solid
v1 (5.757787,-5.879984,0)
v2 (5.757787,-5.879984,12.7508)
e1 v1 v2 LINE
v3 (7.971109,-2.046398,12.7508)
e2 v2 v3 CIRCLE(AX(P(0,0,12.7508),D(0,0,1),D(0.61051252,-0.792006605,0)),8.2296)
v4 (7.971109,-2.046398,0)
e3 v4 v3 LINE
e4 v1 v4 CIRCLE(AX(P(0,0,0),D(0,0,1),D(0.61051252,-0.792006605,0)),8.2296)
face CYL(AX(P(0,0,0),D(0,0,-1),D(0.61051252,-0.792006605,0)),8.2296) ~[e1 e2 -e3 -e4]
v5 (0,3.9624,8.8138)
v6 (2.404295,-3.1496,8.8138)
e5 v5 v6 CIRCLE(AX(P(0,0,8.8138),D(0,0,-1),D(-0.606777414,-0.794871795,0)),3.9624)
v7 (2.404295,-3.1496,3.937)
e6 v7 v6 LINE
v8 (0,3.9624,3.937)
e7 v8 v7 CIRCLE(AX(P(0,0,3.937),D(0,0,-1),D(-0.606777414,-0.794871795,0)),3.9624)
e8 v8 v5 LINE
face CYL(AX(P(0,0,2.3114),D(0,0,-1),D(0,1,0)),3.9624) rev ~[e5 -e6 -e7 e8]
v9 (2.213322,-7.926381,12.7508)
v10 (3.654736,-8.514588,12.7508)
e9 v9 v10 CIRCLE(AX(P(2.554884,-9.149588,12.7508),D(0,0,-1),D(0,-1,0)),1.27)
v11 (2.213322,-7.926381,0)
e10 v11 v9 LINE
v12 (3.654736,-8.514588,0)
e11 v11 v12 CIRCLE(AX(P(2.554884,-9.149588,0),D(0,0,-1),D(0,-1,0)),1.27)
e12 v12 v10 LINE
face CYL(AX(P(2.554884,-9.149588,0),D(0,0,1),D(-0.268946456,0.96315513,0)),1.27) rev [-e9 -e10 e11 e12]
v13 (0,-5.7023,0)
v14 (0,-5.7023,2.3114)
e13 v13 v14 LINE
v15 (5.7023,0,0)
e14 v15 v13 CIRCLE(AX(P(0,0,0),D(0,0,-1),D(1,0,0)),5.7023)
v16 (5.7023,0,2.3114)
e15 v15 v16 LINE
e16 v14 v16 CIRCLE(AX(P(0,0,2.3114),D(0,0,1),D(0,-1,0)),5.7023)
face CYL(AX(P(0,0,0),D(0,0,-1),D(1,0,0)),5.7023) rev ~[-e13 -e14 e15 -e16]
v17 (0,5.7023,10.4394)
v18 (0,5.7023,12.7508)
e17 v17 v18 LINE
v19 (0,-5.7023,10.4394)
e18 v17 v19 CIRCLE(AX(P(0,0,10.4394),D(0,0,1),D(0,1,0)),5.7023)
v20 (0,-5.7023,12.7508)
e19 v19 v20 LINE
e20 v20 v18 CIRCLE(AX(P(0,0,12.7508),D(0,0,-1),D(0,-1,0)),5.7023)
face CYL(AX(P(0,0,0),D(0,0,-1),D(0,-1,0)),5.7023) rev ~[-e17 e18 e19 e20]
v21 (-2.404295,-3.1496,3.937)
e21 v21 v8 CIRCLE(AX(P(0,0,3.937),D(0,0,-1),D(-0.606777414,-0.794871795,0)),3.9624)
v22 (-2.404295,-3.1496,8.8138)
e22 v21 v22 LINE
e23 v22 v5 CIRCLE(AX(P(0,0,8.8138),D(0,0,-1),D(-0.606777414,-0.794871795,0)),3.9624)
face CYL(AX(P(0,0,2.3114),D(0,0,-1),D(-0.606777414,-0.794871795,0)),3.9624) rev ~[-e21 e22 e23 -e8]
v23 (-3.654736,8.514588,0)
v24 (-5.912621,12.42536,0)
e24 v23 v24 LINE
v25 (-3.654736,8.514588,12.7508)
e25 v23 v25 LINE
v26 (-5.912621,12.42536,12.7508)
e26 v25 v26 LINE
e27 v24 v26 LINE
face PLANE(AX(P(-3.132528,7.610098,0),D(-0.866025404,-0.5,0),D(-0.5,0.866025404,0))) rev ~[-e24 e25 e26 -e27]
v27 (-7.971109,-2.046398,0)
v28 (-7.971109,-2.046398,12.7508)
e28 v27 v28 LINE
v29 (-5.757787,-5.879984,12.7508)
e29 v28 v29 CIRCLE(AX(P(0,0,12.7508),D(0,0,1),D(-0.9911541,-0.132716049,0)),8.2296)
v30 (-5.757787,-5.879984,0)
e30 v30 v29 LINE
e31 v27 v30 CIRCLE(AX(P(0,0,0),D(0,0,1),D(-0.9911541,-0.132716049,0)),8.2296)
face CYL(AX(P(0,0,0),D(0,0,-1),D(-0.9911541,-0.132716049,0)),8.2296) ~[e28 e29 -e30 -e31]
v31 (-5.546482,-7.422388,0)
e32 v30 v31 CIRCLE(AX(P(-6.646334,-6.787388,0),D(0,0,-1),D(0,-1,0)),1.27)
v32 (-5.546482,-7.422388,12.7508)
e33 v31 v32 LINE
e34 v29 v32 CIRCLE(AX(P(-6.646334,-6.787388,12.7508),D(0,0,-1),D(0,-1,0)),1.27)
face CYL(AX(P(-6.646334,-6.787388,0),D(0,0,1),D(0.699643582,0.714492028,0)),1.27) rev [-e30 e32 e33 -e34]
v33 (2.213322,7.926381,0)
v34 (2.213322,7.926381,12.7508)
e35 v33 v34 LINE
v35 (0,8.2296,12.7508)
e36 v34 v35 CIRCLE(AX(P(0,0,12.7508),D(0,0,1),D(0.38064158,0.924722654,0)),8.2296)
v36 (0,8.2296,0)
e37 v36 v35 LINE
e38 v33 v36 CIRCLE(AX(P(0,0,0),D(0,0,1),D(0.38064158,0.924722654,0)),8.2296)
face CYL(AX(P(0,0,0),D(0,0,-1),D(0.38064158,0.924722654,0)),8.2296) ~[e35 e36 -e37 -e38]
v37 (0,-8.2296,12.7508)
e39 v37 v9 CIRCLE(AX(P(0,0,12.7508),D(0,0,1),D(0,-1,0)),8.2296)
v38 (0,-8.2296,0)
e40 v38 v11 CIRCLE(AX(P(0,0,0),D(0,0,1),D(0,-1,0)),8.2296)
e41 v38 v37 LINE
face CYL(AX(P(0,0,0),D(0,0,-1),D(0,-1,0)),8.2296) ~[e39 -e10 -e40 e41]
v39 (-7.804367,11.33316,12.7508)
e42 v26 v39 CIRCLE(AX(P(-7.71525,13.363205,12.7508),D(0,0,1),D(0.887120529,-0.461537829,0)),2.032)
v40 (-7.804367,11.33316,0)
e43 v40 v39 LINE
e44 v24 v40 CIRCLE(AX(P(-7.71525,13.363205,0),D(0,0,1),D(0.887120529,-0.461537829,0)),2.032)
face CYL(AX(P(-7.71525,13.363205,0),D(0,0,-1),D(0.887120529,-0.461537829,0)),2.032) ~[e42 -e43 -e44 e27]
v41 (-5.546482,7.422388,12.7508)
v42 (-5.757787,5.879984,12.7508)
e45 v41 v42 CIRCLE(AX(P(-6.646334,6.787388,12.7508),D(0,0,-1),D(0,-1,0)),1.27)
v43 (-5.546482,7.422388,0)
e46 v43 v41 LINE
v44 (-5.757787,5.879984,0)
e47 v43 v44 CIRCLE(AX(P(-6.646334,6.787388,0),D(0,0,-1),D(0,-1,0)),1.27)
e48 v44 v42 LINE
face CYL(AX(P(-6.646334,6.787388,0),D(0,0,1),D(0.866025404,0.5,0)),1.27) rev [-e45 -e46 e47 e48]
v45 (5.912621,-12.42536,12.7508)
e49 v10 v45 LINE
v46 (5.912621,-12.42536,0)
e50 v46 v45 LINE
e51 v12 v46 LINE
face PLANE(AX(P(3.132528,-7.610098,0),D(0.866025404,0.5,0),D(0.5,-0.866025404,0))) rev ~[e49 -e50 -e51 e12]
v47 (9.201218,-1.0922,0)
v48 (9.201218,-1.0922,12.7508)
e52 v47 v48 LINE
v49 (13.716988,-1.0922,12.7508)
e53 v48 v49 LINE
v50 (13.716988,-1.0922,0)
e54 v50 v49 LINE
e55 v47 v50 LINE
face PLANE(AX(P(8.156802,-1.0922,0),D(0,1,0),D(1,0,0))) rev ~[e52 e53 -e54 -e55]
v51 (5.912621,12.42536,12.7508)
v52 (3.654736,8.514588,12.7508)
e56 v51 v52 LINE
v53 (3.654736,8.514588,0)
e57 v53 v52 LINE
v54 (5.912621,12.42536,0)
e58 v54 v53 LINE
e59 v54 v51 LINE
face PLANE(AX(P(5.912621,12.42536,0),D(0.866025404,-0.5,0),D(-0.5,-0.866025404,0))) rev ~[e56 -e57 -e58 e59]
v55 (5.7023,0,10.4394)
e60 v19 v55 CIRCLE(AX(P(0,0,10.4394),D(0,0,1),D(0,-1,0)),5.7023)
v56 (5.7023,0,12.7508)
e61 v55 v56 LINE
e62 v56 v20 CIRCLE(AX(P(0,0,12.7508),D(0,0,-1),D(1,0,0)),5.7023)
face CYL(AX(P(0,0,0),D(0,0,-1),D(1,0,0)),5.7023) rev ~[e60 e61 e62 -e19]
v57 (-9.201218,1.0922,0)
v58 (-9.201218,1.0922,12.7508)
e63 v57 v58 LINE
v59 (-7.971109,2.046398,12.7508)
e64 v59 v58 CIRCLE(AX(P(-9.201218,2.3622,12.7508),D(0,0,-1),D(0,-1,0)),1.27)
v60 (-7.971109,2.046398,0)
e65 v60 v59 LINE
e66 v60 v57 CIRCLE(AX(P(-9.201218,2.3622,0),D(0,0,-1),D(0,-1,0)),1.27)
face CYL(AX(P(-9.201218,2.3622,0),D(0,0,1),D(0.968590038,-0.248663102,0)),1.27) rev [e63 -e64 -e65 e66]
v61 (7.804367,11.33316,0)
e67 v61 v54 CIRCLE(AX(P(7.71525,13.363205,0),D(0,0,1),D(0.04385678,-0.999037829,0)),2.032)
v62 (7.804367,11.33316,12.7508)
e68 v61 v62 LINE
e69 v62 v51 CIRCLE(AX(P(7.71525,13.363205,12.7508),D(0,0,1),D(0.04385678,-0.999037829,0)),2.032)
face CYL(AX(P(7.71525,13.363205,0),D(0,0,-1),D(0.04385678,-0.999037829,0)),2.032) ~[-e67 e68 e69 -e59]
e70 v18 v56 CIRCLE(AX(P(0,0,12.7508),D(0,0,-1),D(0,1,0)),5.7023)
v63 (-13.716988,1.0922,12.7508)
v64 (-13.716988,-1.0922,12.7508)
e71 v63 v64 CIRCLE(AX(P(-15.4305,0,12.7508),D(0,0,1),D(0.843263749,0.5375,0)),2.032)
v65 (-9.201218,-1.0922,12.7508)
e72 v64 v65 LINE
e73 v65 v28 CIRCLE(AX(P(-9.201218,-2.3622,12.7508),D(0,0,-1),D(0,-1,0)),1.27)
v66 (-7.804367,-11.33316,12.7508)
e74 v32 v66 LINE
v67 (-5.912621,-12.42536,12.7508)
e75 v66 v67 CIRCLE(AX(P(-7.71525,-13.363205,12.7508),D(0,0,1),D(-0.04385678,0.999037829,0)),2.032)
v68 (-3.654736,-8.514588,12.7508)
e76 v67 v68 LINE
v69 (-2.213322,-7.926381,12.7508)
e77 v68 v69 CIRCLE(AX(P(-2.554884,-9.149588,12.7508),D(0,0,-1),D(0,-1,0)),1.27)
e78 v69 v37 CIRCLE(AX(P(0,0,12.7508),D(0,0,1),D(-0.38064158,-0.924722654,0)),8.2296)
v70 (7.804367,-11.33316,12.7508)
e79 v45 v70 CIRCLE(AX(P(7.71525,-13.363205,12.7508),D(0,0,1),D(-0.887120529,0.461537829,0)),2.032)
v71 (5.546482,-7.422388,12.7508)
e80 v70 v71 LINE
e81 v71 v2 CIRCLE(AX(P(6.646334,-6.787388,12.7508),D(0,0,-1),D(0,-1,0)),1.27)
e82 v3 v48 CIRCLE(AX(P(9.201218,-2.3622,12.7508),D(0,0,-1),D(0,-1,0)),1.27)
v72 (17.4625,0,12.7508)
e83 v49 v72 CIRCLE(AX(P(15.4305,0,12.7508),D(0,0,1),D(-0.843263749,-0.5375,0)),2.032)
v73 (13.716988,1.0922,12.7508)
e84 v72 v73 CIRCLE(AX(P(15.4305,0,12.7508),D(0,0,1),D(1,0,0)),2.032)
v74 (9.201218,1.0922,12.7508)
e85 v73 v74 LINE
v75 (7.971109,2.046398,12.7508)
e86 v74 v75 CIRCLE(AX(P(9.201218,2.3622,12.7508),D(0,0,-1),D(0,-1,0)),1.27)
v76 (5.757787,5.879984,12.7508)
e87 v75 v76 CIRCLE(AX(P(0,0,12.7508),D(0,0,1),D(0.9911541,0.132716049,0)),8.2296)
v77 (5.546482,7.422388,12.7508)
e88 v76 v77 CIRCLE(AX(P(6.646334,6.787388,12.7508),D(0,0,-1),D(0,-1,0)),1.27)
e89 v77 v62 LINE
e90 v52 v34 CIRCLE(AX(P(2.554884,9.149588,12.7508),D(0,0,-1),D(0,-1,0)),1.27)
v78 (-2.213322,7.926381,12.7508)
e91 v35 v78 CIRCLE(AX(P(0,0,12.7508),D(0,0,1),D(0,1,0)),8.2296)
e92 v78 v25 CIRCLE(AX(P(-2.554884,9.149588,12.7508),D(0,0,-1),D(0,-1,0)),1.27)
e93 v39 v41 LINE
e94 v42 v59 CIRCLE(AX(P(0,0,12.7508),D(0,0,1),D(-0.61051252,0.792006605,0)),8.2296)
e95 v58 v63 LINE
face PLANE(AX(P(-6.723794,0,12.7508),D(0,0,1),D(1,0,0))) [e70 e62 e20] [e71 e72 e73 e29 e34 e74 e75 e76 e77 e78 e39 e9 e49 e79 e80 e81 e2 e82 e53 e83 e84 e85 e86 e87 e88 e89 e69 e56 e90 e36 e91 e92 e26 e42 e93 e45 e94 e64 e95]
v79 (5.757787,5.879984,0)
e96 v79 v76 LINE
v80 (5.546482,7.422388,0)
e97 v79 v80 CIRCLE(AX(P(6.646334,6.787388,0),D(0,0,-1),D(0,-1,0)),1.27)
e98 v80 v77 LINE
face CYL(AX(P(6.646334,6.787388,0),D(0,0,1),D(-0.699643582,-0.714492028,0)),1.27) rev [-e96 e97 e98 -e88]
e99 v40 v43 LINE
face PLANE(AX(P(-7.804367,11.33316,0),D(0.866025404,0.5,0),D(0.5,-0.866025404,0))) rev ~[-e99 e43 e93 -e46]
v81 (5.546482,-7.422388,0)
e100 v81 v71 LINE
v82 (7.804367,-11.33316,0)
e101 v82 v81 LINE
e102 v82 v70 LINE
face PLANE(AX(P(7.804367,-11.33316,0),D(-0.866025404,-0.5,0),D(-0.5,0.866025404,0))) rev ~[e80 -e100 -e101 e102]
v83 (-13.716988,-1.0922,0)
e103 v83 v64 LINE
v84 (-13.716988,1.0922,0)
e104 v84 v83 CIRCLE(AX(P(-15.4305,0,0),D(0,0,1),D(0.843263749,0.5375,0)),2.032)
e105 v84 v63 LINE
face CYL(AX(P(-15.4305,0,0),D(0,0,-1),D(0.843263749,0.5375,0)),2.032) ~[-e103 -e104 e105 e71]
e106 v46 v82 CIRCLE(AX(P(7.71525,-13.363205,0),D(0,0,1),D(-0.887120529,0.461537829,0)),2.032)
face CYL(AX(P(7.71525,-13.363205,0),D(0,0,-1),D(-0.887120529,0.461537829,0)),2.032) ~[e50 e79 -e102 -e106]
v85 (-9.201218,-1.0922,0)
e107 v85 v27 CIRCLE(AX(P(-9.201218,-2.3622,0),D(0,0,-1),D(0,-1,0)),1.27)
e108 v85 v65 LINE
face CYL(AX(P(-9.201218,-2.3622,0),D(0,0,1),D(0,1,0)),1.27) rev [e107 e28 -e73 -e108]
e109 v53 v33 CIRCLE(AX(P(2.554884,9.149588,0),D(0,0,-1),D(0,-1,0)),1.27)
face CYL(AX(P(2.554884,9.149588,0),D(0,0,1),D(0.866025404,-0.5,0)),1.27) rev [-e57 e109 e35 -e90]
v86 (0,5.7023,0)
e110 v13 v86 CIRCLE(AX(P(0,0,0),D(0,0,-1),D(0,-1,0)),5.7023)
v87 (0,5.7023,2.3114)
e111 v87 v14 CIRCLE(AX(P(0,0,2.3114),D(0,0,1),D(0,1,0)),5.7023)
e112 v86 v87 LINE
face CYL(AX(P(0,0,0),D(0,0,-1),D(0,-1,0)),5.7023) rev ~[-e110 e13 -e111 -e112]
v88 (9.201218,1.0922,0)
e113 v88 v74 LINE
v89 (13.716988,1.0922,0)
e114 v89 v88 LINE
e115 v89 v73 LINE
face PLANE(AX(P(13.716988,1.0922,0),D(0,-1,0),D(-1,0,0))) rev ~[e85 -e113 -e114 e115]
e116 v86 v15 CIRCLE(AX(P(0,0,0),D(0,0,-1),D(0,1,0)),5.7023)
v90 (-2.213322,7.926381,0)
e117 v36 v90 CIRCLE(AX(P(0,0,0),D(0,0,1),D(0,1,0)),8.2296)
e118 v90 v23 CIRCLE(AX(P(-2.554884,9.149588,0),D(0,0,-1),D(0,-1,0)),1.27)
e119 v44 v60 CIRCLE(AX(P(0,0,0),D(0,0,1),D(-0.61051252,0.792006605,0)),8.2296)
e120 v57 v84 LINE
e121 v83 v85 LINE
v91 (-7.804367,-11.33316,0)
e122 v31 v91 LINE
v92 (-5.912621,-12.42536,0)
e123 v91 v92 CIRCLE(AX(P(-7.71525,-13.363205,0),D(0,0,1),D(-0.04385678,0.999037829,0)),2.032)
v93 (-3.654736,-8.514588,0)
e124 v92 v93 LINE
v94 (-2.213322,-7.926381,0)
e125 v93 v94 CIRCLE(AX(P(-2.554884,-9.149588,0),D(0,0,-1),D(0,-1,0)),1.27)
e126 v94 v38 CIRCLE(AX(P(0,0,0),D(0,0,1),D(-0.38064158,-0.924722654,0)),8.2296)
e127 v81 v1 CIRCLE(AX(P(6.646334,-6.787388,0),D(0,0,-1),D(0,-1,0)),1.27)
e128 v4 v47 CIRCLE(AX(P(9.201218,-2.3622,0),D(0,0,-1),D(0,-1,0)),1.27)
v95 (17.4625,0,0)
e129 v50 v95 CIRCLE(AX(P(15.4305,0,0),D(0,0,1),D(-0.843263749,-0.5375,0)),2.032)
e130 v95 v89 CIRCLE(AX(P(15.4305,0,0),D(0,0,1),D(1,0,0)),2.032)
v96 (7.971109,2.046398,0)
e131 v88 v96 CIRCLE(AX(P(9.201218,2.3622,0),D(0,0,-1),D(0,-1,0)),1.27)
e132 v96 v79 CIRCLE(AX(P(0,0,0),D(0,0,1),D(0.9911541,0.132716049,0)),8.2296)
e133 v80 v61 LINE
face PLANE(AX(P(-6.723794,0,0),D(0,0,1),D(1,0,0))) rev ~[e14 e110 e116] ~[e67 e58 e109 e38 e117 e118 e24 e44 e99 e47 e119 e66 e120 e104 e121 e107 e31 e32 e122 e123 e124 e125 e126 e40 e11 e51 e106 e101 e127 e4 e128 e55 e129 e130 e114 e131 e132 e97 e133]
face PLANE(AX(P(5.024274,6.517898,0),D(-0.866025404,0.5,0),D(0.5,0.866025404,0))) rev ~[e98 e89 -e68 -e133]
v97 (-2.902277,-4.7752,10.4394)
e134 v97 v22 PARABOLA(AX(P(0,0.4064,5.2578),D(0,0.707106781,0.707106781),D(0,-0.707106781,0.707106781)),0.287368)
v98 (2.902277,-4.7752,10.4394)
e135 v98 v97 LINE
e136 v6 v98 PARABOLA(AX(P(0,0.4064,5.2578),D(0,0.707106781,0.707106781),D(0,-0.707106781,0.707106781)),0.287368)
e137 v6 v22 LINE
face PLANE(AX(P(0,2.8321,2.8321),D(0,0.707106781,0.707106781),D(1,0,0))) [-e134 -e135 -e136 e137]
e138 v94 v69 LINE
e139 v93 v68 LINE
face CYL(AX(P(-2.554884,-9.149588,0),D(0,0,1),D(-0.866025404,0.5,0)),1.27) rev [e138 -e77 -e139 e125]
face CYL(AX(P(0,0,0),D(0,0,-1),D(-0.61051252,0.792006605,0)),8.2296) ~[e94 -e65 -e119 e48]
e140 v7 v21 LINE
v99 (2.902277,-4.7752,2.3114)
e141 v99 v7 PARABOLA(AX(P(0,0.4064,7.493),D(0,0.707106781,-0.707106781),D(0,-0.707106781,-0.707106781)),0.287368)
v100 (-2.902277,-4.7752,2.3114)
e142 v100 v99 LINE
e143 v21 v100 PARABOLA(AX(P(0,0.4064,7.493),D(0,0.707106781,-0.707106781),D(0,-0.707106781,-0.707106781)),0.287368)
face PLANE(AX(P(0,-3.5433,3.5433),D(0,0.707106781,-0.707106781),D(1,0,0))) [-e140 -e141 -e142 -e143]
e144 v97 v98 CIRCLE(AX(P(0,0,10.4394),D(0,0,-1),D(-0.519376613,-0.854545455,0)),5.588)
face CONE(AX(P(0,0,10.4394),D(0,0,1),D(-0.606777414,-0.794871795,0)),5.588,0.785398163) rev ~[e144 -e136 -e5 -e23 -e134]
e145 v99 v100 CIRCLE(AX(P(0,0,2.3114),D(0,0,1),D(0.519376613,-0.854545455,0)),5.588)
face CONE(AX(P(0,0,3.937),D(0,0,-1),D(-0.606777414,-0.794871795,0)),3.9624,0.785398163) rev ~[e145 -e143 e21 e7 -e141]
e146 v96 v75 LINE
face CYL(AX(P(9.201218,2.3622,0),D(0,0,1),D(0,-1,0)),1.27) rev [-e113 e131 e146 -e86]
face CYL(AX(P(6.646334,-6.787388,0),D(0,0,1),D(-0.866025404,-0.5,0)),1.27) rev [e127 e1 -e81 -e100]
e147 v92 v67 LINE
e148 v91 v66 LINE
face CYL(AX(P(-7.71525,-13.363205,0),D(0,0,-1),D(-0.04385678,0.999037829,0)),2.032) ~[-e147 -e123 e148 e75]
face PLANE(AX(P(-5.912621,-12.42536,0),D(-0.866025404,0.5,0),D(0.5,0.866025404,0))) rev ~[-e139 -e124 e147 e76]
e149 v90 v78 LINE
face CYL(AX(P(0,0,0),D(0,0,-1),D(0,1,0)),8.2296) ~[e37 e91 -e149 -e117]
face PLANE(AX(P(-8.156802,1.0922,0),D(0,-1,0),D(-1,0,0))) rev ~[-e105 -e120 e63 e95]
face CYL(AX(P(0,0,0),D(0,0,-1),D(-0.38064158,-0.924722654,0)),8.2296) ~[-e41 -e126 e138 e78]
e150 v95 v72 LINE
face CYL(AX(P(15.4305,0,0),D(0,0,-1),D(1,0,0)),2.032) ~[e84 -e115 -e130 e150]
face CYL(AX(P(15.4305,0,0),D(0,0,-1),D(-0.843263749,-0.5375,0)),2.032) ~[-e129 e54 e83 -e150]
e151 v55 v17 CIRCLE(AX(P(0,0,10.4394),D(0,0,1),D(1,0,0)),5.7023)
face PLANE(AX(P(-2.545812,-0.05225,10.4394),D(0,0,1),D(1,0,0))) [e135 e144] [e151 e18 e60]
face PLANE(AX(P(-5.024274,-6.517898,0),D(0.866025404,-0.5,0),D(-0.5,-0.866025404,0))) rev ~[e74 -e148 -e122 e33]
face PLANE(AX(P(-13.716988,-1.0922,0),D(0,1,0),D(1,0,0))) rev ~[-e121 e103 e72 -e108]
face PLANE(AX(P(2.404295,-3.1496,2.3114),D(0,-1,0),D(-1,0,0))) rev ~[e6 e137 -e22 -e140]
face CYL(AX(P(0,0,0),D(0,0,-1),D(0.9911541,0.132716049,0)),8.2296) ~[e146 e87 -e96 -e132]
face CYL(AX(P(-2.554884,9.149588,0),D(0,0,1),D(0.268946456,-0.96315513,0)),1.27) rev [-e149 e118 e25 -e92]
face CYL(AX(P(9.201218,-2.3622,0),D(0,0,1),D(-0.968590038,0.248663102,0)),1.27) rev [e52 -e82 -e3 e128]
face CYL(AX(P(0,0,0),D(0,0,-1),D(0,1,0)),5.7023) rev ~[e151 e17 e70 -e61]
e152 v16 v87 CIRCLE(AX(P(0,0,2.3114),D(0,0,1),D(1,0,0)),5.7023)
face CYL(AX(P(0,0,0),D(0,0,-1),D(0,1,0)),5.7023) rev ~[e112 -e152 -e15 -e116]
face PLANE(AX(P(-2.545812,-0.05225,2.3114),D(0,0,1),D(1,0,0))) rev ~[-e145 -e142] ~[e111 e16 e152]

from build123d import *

# Parameters (mm, degrees)
F1_DEPTH     = 12.7508
F2_START     = 2.3114
F2_DEPTH     = 8.128
F3_R         = 1.27
F4_T4_DEPTH  = 13.1696453782
F4_S5_R      = 3.9624
F4_T6_DEPTH  = 8
F4_T15_DEPTH = 13.1696453782
F4_S16_R     = 3.9624
F4_T17_DEPTH = 8


# Not quite as in the source:
# - a fillet or chamfer that OpenCascade refuses, or shapes differently, is made with other operations: its cross-section is extruded or revolved along the edge and cut away or added
# - a feature names something its author has since deleted; it is built from what else it names


with BuildPart() as f1:
    # F0 (on Top) → F1 (new body)
    with BuildSketch(Plane.XY):
        with BuildLine():
            ThreePointArc((0, -5.7023), (-5.7023, 0), (0, 5.7023))
            Line((0, 5.7023), (0, 8.2296))
            ThreePointArc((0, 8.2296), (-1.596599089, 8.0732389726), (-3.1325279453, 7.6100975573))
            Line((-3.1325279453, 7.6100975573), (-5.9126210852, 12.4253601255))
            ThreePointArc((-5.9126210852, 12.4253601255), (-8.73125, 15.1229686136), (-7.8043669773, 11.3331601255))
            Line((-7.8043669773, 11.3331601255), (-5.0242738373, 6.5178975573))
            ThreePointArc((-5.0242738373, 6.5178975573), (-7.127042663, 4.1148), (-8.1568017826, 1.0922))
            Line((-8.1568017826, 1.0922), (-13.7169880625, 1.0922))
            ThreePointArc((-13.7169880625, 1.0922), (-17.4625, 0), (-13.7169880625, -1.0922))
            Line((-13.7169880625, -1.0922), (-8.1568017826, -1.0922))
            ThreePointArc((-8.1568017826, -1.0922), (-7.127042663, -4.1148), (-5.0242738373, -6.5178975573))
            Line((-5.0242738373, -6.5178975573), (-7.8043669773, -11.3331601255))
            ThreePointArc((-7.8043669773, -11.3331601255), (-8.73125, -15.1229686136), (-5.9126210852, -12.4253601255))
            Line((-5.9126210852, -12.4253601255), (-3.1325279453, -7.6100975573))
            ThreePointArc((-3.1325279453, -7.6100975573), (-1.596599089, -8.0732389726), (0, -8.2296))
            Line((0, -8.2296), (0, -5.7023))
        make_face()
        with BuildLine():
            ThreePointArc((0, 5.7023), (4.0321349984, 4.0321349984), (5.7023, 0))
            ThreePointArc((5.7023, 0), (4.0321349984, -4.0321349984), (0, -5.7023))
            Line((0, -5.7023), (0, -8.2296))
            ThreePointArc((0, -8.2296), (1.596599089, -8.0732389726), (3.1325279453, -7.6100975573))
            Line((3.1325279453, -7.6100975573), (5.9126210852, -12.4253601255))
            ThreePointArc((5.9126210852, -12.4253601255), (8.73125, -15.1229686136), (7.8043669773, -11.3331601255))
            Line((7.8043669773, -11.3331601255), (5.0242738373, -6.5178975573))
            ThreePointArc((5.0242738373, -6.5178975573), (7.127042663, -4.1148), (8.1568017826, -1.0922))
            Line((8.1568017826, -1.0922), (13.7169880625, -1.0922))
            ThreePointArc((13.7169880625, -1.0922), (15.9993443297, -1.9507537334), (17.4625, 0))
            ThreePointArc((17.4625, 0), (15.9993443297, 1.9507537334), (13.7169880625, 1.0922))
            Line((13.7169880625, 1.0922), (8.1568017826, 1.0922))
            ThreePointArc((8.1568017826, 1.0922), (7.127042663, 4.1148), (5.0242738373, 6.5178975573))
            Line((5.0242738373, 6.5178975573), (7.8043669773, 11.3331601255))
            ThreePointArc((7.8043669773, 11.3331601255), (8.73125, 15.1229686136), (5.9126210852, 12.4253601255))
            Line((5.9126210852, 12.4253601255), (3.1325279453, 7.6100975573))
            ThreePointArc((3.1325279453, 7.6100975573), (1.596599089, 8.0732389726), (0, 8.2296))
            Line((0, 8.2296), (0, 5.7023))
        make_face()
    extrude(amount=F1_DEPTH)

    # F0 (on Top) → F2 (join)
    with BuildSketch(Plane.XY.offset(F2_START)):
        with BuildLine():
            Line((0, 3.9624), (0, 5.7023))
            ThreePointArc((0, 5.7023), (-5.7023, 0), (0, -5.7023))
            Line((0, -5.7023), (0, -3.1496))
            Line((0, -3.1496), (-2.4042948239, -3.1496))
            ThreePointArc((-2.4042948239, -3.1496), (-3.7537040906, 1.2689835933), (0, 3.9624))
        make_face()
        with BuildLine():
            ThreePointArc((0, -5.7023), (4.0321349984, -4.0321349984), (5.7023, 0))
            ThreePointArc((5.7023, 0), (4.0321349984, 4.0321349984), (0, 5.7023))
            Line((0, 5.7023), (0, 3.9624))
            ThreePointArc((0, 3.9624), (3.7537040906, 1.2689835933), (2.4042948239, -3.1496))
            Line((2.4042948239, -3.1496), (0, -3.1496))
            Line((0, -3.1496), (0, -5.7023))
        make_face()
    extrude(amount=F2_DEPTH)

    # F3
    f3_edges = [f1.edges().sort_by_distance(p)[0] for p in [
        (-8.156802, 1.0922, 6.3754),
        (-8.156802, -1.0922, 6.3754),
        (3.132528, 7.610098, 6.3754),
        (-3.132528, 7.610098, 6.3754),
        (5.024274, 6.517898, 6.3754),
        (8.156802, 1.0922, 6.3754),
        (8.156802, -1.0922, 6.3754),
        (5.024274, -6.517898, 6.3754),
        (3.132528, -7.610098, 6.3754),
        (-3.132528, -7.610098, 6.3754),
        (-5.024274, -6.517898, 6.3754),
        (-5.024274, 6.517898, 6.3754),
    ]]
    fillet(f3_edges, radius=F3_R)

    # F4: chamfer of 1.6256 on 4 edges, made by hand


with BuildPart() as f4_tool2:
    # F4_s3 → F4_t4 (new body)
    with BuildSketch(Plane.YZ.offset(6.5848226891)):
        Polygon((-3.1496, 3.937), (-4.7752, 2.3114), (-3.1496, 2.3114), align=None)
    extrude(amount=-F4_T4_DEPTH)

    # F4_s5 → F4_t6 (intersect, symmetric)
    with BuildSketch(Plane.XY.offset(3.1)):
        Circle(F4_S5_R)
    extrude(amount=F4_T6_DEPTH, both=True, mode=Mode.INTERSECT)


with BuildPart() as f1_1:
    add(f1.part)

    # F4_t1: cut F4_tool2
    add(f4_tool2.part, mode=Mode.SUBTRACT)


with BuildPart() as f4_tool8:
    # F4_s9 → F4_t10 (revolve)
    with BuildSketch(Plane(origin=(0, 0, 0), x_dir=(0, 0, 1), z_dir=(0.7948717949, -0.6067774137, 0))):
        Polygon((3.937, 3.9624), (2.3114, 5.588), (2.3114, 3.9624), align=None)
    revolve(axis=Axis((0, 0, 2.3114), (0, 0, -1)))

    split(bisect_by=Plane(origin=(0, -3.5433, 3.5433), x_dir=(1, 0, 0), z_dir=(0, 0.7071067812, -0.7071067812)), keep=Keep.TOP)


with BuildPart() as f1_2:
    add(f1_1.part)

    # F4_t7: cut F4_tool8
    add(f4_tool8.part, mode=Mode.SUBTRACT)


with BuildPart() as f4_tool13:
    # F4_s14 → F4_t15 (new body)
    with BuildSketch(Plane.YZ.offset(6.5848226891)):
        Polygon((-4.7752, 10.4394), (-3.1496, 8.8138), (-3.1496, 10.4394), align=None)
    extrude(amount=-F4_T15_DEPTH)

    # F4_s16 → F4_t17 (intersect, symmetric)
    with BuildSketch(Plane.XY.offset(9.6)):
        Circle(F4_S16_R)
    extrude(amount=F4_T17_DEPTH, both=True, mode=Mode.INTERSECT)


with BuildPart() as f1_3:
    add(f1_2.part)

    # F4_t12: cut F4_tool13
    add(f4_tool13.part, mode=Mode.SUBTRACT)


with BuildPart() as f4_tool19:
    # F4_s20 → F4_t21 (revolve)
    with BuildSketch(Plane(origin=(0, 0, 0), x_dir=(0, 0, 1), z_dir=(0.7948717949, -0.6067774137, 0))):
        Polygon((10.4394, 5.588), (8.8138, 3.9624), (10.4394, 3.9624), align=None)
    revolve(axis=Axis((0, 0, 10.4394), (0, 0, -1)))

    split(bisect_by=Plane(origin=(0, 2.8321, 2.8321), x_dir=(1, 0, 0), z_dir=(0, 0.7071067812, 0.7071067812)), keep=Keep.TOP)


with BuildPart() as f1_4:
    add(f1_3.part)

    # F4_t18: cut F4_tool19
    add(f4_tool19.part, mode=Mode.SUBTRACT)


solid = f1_4.part
